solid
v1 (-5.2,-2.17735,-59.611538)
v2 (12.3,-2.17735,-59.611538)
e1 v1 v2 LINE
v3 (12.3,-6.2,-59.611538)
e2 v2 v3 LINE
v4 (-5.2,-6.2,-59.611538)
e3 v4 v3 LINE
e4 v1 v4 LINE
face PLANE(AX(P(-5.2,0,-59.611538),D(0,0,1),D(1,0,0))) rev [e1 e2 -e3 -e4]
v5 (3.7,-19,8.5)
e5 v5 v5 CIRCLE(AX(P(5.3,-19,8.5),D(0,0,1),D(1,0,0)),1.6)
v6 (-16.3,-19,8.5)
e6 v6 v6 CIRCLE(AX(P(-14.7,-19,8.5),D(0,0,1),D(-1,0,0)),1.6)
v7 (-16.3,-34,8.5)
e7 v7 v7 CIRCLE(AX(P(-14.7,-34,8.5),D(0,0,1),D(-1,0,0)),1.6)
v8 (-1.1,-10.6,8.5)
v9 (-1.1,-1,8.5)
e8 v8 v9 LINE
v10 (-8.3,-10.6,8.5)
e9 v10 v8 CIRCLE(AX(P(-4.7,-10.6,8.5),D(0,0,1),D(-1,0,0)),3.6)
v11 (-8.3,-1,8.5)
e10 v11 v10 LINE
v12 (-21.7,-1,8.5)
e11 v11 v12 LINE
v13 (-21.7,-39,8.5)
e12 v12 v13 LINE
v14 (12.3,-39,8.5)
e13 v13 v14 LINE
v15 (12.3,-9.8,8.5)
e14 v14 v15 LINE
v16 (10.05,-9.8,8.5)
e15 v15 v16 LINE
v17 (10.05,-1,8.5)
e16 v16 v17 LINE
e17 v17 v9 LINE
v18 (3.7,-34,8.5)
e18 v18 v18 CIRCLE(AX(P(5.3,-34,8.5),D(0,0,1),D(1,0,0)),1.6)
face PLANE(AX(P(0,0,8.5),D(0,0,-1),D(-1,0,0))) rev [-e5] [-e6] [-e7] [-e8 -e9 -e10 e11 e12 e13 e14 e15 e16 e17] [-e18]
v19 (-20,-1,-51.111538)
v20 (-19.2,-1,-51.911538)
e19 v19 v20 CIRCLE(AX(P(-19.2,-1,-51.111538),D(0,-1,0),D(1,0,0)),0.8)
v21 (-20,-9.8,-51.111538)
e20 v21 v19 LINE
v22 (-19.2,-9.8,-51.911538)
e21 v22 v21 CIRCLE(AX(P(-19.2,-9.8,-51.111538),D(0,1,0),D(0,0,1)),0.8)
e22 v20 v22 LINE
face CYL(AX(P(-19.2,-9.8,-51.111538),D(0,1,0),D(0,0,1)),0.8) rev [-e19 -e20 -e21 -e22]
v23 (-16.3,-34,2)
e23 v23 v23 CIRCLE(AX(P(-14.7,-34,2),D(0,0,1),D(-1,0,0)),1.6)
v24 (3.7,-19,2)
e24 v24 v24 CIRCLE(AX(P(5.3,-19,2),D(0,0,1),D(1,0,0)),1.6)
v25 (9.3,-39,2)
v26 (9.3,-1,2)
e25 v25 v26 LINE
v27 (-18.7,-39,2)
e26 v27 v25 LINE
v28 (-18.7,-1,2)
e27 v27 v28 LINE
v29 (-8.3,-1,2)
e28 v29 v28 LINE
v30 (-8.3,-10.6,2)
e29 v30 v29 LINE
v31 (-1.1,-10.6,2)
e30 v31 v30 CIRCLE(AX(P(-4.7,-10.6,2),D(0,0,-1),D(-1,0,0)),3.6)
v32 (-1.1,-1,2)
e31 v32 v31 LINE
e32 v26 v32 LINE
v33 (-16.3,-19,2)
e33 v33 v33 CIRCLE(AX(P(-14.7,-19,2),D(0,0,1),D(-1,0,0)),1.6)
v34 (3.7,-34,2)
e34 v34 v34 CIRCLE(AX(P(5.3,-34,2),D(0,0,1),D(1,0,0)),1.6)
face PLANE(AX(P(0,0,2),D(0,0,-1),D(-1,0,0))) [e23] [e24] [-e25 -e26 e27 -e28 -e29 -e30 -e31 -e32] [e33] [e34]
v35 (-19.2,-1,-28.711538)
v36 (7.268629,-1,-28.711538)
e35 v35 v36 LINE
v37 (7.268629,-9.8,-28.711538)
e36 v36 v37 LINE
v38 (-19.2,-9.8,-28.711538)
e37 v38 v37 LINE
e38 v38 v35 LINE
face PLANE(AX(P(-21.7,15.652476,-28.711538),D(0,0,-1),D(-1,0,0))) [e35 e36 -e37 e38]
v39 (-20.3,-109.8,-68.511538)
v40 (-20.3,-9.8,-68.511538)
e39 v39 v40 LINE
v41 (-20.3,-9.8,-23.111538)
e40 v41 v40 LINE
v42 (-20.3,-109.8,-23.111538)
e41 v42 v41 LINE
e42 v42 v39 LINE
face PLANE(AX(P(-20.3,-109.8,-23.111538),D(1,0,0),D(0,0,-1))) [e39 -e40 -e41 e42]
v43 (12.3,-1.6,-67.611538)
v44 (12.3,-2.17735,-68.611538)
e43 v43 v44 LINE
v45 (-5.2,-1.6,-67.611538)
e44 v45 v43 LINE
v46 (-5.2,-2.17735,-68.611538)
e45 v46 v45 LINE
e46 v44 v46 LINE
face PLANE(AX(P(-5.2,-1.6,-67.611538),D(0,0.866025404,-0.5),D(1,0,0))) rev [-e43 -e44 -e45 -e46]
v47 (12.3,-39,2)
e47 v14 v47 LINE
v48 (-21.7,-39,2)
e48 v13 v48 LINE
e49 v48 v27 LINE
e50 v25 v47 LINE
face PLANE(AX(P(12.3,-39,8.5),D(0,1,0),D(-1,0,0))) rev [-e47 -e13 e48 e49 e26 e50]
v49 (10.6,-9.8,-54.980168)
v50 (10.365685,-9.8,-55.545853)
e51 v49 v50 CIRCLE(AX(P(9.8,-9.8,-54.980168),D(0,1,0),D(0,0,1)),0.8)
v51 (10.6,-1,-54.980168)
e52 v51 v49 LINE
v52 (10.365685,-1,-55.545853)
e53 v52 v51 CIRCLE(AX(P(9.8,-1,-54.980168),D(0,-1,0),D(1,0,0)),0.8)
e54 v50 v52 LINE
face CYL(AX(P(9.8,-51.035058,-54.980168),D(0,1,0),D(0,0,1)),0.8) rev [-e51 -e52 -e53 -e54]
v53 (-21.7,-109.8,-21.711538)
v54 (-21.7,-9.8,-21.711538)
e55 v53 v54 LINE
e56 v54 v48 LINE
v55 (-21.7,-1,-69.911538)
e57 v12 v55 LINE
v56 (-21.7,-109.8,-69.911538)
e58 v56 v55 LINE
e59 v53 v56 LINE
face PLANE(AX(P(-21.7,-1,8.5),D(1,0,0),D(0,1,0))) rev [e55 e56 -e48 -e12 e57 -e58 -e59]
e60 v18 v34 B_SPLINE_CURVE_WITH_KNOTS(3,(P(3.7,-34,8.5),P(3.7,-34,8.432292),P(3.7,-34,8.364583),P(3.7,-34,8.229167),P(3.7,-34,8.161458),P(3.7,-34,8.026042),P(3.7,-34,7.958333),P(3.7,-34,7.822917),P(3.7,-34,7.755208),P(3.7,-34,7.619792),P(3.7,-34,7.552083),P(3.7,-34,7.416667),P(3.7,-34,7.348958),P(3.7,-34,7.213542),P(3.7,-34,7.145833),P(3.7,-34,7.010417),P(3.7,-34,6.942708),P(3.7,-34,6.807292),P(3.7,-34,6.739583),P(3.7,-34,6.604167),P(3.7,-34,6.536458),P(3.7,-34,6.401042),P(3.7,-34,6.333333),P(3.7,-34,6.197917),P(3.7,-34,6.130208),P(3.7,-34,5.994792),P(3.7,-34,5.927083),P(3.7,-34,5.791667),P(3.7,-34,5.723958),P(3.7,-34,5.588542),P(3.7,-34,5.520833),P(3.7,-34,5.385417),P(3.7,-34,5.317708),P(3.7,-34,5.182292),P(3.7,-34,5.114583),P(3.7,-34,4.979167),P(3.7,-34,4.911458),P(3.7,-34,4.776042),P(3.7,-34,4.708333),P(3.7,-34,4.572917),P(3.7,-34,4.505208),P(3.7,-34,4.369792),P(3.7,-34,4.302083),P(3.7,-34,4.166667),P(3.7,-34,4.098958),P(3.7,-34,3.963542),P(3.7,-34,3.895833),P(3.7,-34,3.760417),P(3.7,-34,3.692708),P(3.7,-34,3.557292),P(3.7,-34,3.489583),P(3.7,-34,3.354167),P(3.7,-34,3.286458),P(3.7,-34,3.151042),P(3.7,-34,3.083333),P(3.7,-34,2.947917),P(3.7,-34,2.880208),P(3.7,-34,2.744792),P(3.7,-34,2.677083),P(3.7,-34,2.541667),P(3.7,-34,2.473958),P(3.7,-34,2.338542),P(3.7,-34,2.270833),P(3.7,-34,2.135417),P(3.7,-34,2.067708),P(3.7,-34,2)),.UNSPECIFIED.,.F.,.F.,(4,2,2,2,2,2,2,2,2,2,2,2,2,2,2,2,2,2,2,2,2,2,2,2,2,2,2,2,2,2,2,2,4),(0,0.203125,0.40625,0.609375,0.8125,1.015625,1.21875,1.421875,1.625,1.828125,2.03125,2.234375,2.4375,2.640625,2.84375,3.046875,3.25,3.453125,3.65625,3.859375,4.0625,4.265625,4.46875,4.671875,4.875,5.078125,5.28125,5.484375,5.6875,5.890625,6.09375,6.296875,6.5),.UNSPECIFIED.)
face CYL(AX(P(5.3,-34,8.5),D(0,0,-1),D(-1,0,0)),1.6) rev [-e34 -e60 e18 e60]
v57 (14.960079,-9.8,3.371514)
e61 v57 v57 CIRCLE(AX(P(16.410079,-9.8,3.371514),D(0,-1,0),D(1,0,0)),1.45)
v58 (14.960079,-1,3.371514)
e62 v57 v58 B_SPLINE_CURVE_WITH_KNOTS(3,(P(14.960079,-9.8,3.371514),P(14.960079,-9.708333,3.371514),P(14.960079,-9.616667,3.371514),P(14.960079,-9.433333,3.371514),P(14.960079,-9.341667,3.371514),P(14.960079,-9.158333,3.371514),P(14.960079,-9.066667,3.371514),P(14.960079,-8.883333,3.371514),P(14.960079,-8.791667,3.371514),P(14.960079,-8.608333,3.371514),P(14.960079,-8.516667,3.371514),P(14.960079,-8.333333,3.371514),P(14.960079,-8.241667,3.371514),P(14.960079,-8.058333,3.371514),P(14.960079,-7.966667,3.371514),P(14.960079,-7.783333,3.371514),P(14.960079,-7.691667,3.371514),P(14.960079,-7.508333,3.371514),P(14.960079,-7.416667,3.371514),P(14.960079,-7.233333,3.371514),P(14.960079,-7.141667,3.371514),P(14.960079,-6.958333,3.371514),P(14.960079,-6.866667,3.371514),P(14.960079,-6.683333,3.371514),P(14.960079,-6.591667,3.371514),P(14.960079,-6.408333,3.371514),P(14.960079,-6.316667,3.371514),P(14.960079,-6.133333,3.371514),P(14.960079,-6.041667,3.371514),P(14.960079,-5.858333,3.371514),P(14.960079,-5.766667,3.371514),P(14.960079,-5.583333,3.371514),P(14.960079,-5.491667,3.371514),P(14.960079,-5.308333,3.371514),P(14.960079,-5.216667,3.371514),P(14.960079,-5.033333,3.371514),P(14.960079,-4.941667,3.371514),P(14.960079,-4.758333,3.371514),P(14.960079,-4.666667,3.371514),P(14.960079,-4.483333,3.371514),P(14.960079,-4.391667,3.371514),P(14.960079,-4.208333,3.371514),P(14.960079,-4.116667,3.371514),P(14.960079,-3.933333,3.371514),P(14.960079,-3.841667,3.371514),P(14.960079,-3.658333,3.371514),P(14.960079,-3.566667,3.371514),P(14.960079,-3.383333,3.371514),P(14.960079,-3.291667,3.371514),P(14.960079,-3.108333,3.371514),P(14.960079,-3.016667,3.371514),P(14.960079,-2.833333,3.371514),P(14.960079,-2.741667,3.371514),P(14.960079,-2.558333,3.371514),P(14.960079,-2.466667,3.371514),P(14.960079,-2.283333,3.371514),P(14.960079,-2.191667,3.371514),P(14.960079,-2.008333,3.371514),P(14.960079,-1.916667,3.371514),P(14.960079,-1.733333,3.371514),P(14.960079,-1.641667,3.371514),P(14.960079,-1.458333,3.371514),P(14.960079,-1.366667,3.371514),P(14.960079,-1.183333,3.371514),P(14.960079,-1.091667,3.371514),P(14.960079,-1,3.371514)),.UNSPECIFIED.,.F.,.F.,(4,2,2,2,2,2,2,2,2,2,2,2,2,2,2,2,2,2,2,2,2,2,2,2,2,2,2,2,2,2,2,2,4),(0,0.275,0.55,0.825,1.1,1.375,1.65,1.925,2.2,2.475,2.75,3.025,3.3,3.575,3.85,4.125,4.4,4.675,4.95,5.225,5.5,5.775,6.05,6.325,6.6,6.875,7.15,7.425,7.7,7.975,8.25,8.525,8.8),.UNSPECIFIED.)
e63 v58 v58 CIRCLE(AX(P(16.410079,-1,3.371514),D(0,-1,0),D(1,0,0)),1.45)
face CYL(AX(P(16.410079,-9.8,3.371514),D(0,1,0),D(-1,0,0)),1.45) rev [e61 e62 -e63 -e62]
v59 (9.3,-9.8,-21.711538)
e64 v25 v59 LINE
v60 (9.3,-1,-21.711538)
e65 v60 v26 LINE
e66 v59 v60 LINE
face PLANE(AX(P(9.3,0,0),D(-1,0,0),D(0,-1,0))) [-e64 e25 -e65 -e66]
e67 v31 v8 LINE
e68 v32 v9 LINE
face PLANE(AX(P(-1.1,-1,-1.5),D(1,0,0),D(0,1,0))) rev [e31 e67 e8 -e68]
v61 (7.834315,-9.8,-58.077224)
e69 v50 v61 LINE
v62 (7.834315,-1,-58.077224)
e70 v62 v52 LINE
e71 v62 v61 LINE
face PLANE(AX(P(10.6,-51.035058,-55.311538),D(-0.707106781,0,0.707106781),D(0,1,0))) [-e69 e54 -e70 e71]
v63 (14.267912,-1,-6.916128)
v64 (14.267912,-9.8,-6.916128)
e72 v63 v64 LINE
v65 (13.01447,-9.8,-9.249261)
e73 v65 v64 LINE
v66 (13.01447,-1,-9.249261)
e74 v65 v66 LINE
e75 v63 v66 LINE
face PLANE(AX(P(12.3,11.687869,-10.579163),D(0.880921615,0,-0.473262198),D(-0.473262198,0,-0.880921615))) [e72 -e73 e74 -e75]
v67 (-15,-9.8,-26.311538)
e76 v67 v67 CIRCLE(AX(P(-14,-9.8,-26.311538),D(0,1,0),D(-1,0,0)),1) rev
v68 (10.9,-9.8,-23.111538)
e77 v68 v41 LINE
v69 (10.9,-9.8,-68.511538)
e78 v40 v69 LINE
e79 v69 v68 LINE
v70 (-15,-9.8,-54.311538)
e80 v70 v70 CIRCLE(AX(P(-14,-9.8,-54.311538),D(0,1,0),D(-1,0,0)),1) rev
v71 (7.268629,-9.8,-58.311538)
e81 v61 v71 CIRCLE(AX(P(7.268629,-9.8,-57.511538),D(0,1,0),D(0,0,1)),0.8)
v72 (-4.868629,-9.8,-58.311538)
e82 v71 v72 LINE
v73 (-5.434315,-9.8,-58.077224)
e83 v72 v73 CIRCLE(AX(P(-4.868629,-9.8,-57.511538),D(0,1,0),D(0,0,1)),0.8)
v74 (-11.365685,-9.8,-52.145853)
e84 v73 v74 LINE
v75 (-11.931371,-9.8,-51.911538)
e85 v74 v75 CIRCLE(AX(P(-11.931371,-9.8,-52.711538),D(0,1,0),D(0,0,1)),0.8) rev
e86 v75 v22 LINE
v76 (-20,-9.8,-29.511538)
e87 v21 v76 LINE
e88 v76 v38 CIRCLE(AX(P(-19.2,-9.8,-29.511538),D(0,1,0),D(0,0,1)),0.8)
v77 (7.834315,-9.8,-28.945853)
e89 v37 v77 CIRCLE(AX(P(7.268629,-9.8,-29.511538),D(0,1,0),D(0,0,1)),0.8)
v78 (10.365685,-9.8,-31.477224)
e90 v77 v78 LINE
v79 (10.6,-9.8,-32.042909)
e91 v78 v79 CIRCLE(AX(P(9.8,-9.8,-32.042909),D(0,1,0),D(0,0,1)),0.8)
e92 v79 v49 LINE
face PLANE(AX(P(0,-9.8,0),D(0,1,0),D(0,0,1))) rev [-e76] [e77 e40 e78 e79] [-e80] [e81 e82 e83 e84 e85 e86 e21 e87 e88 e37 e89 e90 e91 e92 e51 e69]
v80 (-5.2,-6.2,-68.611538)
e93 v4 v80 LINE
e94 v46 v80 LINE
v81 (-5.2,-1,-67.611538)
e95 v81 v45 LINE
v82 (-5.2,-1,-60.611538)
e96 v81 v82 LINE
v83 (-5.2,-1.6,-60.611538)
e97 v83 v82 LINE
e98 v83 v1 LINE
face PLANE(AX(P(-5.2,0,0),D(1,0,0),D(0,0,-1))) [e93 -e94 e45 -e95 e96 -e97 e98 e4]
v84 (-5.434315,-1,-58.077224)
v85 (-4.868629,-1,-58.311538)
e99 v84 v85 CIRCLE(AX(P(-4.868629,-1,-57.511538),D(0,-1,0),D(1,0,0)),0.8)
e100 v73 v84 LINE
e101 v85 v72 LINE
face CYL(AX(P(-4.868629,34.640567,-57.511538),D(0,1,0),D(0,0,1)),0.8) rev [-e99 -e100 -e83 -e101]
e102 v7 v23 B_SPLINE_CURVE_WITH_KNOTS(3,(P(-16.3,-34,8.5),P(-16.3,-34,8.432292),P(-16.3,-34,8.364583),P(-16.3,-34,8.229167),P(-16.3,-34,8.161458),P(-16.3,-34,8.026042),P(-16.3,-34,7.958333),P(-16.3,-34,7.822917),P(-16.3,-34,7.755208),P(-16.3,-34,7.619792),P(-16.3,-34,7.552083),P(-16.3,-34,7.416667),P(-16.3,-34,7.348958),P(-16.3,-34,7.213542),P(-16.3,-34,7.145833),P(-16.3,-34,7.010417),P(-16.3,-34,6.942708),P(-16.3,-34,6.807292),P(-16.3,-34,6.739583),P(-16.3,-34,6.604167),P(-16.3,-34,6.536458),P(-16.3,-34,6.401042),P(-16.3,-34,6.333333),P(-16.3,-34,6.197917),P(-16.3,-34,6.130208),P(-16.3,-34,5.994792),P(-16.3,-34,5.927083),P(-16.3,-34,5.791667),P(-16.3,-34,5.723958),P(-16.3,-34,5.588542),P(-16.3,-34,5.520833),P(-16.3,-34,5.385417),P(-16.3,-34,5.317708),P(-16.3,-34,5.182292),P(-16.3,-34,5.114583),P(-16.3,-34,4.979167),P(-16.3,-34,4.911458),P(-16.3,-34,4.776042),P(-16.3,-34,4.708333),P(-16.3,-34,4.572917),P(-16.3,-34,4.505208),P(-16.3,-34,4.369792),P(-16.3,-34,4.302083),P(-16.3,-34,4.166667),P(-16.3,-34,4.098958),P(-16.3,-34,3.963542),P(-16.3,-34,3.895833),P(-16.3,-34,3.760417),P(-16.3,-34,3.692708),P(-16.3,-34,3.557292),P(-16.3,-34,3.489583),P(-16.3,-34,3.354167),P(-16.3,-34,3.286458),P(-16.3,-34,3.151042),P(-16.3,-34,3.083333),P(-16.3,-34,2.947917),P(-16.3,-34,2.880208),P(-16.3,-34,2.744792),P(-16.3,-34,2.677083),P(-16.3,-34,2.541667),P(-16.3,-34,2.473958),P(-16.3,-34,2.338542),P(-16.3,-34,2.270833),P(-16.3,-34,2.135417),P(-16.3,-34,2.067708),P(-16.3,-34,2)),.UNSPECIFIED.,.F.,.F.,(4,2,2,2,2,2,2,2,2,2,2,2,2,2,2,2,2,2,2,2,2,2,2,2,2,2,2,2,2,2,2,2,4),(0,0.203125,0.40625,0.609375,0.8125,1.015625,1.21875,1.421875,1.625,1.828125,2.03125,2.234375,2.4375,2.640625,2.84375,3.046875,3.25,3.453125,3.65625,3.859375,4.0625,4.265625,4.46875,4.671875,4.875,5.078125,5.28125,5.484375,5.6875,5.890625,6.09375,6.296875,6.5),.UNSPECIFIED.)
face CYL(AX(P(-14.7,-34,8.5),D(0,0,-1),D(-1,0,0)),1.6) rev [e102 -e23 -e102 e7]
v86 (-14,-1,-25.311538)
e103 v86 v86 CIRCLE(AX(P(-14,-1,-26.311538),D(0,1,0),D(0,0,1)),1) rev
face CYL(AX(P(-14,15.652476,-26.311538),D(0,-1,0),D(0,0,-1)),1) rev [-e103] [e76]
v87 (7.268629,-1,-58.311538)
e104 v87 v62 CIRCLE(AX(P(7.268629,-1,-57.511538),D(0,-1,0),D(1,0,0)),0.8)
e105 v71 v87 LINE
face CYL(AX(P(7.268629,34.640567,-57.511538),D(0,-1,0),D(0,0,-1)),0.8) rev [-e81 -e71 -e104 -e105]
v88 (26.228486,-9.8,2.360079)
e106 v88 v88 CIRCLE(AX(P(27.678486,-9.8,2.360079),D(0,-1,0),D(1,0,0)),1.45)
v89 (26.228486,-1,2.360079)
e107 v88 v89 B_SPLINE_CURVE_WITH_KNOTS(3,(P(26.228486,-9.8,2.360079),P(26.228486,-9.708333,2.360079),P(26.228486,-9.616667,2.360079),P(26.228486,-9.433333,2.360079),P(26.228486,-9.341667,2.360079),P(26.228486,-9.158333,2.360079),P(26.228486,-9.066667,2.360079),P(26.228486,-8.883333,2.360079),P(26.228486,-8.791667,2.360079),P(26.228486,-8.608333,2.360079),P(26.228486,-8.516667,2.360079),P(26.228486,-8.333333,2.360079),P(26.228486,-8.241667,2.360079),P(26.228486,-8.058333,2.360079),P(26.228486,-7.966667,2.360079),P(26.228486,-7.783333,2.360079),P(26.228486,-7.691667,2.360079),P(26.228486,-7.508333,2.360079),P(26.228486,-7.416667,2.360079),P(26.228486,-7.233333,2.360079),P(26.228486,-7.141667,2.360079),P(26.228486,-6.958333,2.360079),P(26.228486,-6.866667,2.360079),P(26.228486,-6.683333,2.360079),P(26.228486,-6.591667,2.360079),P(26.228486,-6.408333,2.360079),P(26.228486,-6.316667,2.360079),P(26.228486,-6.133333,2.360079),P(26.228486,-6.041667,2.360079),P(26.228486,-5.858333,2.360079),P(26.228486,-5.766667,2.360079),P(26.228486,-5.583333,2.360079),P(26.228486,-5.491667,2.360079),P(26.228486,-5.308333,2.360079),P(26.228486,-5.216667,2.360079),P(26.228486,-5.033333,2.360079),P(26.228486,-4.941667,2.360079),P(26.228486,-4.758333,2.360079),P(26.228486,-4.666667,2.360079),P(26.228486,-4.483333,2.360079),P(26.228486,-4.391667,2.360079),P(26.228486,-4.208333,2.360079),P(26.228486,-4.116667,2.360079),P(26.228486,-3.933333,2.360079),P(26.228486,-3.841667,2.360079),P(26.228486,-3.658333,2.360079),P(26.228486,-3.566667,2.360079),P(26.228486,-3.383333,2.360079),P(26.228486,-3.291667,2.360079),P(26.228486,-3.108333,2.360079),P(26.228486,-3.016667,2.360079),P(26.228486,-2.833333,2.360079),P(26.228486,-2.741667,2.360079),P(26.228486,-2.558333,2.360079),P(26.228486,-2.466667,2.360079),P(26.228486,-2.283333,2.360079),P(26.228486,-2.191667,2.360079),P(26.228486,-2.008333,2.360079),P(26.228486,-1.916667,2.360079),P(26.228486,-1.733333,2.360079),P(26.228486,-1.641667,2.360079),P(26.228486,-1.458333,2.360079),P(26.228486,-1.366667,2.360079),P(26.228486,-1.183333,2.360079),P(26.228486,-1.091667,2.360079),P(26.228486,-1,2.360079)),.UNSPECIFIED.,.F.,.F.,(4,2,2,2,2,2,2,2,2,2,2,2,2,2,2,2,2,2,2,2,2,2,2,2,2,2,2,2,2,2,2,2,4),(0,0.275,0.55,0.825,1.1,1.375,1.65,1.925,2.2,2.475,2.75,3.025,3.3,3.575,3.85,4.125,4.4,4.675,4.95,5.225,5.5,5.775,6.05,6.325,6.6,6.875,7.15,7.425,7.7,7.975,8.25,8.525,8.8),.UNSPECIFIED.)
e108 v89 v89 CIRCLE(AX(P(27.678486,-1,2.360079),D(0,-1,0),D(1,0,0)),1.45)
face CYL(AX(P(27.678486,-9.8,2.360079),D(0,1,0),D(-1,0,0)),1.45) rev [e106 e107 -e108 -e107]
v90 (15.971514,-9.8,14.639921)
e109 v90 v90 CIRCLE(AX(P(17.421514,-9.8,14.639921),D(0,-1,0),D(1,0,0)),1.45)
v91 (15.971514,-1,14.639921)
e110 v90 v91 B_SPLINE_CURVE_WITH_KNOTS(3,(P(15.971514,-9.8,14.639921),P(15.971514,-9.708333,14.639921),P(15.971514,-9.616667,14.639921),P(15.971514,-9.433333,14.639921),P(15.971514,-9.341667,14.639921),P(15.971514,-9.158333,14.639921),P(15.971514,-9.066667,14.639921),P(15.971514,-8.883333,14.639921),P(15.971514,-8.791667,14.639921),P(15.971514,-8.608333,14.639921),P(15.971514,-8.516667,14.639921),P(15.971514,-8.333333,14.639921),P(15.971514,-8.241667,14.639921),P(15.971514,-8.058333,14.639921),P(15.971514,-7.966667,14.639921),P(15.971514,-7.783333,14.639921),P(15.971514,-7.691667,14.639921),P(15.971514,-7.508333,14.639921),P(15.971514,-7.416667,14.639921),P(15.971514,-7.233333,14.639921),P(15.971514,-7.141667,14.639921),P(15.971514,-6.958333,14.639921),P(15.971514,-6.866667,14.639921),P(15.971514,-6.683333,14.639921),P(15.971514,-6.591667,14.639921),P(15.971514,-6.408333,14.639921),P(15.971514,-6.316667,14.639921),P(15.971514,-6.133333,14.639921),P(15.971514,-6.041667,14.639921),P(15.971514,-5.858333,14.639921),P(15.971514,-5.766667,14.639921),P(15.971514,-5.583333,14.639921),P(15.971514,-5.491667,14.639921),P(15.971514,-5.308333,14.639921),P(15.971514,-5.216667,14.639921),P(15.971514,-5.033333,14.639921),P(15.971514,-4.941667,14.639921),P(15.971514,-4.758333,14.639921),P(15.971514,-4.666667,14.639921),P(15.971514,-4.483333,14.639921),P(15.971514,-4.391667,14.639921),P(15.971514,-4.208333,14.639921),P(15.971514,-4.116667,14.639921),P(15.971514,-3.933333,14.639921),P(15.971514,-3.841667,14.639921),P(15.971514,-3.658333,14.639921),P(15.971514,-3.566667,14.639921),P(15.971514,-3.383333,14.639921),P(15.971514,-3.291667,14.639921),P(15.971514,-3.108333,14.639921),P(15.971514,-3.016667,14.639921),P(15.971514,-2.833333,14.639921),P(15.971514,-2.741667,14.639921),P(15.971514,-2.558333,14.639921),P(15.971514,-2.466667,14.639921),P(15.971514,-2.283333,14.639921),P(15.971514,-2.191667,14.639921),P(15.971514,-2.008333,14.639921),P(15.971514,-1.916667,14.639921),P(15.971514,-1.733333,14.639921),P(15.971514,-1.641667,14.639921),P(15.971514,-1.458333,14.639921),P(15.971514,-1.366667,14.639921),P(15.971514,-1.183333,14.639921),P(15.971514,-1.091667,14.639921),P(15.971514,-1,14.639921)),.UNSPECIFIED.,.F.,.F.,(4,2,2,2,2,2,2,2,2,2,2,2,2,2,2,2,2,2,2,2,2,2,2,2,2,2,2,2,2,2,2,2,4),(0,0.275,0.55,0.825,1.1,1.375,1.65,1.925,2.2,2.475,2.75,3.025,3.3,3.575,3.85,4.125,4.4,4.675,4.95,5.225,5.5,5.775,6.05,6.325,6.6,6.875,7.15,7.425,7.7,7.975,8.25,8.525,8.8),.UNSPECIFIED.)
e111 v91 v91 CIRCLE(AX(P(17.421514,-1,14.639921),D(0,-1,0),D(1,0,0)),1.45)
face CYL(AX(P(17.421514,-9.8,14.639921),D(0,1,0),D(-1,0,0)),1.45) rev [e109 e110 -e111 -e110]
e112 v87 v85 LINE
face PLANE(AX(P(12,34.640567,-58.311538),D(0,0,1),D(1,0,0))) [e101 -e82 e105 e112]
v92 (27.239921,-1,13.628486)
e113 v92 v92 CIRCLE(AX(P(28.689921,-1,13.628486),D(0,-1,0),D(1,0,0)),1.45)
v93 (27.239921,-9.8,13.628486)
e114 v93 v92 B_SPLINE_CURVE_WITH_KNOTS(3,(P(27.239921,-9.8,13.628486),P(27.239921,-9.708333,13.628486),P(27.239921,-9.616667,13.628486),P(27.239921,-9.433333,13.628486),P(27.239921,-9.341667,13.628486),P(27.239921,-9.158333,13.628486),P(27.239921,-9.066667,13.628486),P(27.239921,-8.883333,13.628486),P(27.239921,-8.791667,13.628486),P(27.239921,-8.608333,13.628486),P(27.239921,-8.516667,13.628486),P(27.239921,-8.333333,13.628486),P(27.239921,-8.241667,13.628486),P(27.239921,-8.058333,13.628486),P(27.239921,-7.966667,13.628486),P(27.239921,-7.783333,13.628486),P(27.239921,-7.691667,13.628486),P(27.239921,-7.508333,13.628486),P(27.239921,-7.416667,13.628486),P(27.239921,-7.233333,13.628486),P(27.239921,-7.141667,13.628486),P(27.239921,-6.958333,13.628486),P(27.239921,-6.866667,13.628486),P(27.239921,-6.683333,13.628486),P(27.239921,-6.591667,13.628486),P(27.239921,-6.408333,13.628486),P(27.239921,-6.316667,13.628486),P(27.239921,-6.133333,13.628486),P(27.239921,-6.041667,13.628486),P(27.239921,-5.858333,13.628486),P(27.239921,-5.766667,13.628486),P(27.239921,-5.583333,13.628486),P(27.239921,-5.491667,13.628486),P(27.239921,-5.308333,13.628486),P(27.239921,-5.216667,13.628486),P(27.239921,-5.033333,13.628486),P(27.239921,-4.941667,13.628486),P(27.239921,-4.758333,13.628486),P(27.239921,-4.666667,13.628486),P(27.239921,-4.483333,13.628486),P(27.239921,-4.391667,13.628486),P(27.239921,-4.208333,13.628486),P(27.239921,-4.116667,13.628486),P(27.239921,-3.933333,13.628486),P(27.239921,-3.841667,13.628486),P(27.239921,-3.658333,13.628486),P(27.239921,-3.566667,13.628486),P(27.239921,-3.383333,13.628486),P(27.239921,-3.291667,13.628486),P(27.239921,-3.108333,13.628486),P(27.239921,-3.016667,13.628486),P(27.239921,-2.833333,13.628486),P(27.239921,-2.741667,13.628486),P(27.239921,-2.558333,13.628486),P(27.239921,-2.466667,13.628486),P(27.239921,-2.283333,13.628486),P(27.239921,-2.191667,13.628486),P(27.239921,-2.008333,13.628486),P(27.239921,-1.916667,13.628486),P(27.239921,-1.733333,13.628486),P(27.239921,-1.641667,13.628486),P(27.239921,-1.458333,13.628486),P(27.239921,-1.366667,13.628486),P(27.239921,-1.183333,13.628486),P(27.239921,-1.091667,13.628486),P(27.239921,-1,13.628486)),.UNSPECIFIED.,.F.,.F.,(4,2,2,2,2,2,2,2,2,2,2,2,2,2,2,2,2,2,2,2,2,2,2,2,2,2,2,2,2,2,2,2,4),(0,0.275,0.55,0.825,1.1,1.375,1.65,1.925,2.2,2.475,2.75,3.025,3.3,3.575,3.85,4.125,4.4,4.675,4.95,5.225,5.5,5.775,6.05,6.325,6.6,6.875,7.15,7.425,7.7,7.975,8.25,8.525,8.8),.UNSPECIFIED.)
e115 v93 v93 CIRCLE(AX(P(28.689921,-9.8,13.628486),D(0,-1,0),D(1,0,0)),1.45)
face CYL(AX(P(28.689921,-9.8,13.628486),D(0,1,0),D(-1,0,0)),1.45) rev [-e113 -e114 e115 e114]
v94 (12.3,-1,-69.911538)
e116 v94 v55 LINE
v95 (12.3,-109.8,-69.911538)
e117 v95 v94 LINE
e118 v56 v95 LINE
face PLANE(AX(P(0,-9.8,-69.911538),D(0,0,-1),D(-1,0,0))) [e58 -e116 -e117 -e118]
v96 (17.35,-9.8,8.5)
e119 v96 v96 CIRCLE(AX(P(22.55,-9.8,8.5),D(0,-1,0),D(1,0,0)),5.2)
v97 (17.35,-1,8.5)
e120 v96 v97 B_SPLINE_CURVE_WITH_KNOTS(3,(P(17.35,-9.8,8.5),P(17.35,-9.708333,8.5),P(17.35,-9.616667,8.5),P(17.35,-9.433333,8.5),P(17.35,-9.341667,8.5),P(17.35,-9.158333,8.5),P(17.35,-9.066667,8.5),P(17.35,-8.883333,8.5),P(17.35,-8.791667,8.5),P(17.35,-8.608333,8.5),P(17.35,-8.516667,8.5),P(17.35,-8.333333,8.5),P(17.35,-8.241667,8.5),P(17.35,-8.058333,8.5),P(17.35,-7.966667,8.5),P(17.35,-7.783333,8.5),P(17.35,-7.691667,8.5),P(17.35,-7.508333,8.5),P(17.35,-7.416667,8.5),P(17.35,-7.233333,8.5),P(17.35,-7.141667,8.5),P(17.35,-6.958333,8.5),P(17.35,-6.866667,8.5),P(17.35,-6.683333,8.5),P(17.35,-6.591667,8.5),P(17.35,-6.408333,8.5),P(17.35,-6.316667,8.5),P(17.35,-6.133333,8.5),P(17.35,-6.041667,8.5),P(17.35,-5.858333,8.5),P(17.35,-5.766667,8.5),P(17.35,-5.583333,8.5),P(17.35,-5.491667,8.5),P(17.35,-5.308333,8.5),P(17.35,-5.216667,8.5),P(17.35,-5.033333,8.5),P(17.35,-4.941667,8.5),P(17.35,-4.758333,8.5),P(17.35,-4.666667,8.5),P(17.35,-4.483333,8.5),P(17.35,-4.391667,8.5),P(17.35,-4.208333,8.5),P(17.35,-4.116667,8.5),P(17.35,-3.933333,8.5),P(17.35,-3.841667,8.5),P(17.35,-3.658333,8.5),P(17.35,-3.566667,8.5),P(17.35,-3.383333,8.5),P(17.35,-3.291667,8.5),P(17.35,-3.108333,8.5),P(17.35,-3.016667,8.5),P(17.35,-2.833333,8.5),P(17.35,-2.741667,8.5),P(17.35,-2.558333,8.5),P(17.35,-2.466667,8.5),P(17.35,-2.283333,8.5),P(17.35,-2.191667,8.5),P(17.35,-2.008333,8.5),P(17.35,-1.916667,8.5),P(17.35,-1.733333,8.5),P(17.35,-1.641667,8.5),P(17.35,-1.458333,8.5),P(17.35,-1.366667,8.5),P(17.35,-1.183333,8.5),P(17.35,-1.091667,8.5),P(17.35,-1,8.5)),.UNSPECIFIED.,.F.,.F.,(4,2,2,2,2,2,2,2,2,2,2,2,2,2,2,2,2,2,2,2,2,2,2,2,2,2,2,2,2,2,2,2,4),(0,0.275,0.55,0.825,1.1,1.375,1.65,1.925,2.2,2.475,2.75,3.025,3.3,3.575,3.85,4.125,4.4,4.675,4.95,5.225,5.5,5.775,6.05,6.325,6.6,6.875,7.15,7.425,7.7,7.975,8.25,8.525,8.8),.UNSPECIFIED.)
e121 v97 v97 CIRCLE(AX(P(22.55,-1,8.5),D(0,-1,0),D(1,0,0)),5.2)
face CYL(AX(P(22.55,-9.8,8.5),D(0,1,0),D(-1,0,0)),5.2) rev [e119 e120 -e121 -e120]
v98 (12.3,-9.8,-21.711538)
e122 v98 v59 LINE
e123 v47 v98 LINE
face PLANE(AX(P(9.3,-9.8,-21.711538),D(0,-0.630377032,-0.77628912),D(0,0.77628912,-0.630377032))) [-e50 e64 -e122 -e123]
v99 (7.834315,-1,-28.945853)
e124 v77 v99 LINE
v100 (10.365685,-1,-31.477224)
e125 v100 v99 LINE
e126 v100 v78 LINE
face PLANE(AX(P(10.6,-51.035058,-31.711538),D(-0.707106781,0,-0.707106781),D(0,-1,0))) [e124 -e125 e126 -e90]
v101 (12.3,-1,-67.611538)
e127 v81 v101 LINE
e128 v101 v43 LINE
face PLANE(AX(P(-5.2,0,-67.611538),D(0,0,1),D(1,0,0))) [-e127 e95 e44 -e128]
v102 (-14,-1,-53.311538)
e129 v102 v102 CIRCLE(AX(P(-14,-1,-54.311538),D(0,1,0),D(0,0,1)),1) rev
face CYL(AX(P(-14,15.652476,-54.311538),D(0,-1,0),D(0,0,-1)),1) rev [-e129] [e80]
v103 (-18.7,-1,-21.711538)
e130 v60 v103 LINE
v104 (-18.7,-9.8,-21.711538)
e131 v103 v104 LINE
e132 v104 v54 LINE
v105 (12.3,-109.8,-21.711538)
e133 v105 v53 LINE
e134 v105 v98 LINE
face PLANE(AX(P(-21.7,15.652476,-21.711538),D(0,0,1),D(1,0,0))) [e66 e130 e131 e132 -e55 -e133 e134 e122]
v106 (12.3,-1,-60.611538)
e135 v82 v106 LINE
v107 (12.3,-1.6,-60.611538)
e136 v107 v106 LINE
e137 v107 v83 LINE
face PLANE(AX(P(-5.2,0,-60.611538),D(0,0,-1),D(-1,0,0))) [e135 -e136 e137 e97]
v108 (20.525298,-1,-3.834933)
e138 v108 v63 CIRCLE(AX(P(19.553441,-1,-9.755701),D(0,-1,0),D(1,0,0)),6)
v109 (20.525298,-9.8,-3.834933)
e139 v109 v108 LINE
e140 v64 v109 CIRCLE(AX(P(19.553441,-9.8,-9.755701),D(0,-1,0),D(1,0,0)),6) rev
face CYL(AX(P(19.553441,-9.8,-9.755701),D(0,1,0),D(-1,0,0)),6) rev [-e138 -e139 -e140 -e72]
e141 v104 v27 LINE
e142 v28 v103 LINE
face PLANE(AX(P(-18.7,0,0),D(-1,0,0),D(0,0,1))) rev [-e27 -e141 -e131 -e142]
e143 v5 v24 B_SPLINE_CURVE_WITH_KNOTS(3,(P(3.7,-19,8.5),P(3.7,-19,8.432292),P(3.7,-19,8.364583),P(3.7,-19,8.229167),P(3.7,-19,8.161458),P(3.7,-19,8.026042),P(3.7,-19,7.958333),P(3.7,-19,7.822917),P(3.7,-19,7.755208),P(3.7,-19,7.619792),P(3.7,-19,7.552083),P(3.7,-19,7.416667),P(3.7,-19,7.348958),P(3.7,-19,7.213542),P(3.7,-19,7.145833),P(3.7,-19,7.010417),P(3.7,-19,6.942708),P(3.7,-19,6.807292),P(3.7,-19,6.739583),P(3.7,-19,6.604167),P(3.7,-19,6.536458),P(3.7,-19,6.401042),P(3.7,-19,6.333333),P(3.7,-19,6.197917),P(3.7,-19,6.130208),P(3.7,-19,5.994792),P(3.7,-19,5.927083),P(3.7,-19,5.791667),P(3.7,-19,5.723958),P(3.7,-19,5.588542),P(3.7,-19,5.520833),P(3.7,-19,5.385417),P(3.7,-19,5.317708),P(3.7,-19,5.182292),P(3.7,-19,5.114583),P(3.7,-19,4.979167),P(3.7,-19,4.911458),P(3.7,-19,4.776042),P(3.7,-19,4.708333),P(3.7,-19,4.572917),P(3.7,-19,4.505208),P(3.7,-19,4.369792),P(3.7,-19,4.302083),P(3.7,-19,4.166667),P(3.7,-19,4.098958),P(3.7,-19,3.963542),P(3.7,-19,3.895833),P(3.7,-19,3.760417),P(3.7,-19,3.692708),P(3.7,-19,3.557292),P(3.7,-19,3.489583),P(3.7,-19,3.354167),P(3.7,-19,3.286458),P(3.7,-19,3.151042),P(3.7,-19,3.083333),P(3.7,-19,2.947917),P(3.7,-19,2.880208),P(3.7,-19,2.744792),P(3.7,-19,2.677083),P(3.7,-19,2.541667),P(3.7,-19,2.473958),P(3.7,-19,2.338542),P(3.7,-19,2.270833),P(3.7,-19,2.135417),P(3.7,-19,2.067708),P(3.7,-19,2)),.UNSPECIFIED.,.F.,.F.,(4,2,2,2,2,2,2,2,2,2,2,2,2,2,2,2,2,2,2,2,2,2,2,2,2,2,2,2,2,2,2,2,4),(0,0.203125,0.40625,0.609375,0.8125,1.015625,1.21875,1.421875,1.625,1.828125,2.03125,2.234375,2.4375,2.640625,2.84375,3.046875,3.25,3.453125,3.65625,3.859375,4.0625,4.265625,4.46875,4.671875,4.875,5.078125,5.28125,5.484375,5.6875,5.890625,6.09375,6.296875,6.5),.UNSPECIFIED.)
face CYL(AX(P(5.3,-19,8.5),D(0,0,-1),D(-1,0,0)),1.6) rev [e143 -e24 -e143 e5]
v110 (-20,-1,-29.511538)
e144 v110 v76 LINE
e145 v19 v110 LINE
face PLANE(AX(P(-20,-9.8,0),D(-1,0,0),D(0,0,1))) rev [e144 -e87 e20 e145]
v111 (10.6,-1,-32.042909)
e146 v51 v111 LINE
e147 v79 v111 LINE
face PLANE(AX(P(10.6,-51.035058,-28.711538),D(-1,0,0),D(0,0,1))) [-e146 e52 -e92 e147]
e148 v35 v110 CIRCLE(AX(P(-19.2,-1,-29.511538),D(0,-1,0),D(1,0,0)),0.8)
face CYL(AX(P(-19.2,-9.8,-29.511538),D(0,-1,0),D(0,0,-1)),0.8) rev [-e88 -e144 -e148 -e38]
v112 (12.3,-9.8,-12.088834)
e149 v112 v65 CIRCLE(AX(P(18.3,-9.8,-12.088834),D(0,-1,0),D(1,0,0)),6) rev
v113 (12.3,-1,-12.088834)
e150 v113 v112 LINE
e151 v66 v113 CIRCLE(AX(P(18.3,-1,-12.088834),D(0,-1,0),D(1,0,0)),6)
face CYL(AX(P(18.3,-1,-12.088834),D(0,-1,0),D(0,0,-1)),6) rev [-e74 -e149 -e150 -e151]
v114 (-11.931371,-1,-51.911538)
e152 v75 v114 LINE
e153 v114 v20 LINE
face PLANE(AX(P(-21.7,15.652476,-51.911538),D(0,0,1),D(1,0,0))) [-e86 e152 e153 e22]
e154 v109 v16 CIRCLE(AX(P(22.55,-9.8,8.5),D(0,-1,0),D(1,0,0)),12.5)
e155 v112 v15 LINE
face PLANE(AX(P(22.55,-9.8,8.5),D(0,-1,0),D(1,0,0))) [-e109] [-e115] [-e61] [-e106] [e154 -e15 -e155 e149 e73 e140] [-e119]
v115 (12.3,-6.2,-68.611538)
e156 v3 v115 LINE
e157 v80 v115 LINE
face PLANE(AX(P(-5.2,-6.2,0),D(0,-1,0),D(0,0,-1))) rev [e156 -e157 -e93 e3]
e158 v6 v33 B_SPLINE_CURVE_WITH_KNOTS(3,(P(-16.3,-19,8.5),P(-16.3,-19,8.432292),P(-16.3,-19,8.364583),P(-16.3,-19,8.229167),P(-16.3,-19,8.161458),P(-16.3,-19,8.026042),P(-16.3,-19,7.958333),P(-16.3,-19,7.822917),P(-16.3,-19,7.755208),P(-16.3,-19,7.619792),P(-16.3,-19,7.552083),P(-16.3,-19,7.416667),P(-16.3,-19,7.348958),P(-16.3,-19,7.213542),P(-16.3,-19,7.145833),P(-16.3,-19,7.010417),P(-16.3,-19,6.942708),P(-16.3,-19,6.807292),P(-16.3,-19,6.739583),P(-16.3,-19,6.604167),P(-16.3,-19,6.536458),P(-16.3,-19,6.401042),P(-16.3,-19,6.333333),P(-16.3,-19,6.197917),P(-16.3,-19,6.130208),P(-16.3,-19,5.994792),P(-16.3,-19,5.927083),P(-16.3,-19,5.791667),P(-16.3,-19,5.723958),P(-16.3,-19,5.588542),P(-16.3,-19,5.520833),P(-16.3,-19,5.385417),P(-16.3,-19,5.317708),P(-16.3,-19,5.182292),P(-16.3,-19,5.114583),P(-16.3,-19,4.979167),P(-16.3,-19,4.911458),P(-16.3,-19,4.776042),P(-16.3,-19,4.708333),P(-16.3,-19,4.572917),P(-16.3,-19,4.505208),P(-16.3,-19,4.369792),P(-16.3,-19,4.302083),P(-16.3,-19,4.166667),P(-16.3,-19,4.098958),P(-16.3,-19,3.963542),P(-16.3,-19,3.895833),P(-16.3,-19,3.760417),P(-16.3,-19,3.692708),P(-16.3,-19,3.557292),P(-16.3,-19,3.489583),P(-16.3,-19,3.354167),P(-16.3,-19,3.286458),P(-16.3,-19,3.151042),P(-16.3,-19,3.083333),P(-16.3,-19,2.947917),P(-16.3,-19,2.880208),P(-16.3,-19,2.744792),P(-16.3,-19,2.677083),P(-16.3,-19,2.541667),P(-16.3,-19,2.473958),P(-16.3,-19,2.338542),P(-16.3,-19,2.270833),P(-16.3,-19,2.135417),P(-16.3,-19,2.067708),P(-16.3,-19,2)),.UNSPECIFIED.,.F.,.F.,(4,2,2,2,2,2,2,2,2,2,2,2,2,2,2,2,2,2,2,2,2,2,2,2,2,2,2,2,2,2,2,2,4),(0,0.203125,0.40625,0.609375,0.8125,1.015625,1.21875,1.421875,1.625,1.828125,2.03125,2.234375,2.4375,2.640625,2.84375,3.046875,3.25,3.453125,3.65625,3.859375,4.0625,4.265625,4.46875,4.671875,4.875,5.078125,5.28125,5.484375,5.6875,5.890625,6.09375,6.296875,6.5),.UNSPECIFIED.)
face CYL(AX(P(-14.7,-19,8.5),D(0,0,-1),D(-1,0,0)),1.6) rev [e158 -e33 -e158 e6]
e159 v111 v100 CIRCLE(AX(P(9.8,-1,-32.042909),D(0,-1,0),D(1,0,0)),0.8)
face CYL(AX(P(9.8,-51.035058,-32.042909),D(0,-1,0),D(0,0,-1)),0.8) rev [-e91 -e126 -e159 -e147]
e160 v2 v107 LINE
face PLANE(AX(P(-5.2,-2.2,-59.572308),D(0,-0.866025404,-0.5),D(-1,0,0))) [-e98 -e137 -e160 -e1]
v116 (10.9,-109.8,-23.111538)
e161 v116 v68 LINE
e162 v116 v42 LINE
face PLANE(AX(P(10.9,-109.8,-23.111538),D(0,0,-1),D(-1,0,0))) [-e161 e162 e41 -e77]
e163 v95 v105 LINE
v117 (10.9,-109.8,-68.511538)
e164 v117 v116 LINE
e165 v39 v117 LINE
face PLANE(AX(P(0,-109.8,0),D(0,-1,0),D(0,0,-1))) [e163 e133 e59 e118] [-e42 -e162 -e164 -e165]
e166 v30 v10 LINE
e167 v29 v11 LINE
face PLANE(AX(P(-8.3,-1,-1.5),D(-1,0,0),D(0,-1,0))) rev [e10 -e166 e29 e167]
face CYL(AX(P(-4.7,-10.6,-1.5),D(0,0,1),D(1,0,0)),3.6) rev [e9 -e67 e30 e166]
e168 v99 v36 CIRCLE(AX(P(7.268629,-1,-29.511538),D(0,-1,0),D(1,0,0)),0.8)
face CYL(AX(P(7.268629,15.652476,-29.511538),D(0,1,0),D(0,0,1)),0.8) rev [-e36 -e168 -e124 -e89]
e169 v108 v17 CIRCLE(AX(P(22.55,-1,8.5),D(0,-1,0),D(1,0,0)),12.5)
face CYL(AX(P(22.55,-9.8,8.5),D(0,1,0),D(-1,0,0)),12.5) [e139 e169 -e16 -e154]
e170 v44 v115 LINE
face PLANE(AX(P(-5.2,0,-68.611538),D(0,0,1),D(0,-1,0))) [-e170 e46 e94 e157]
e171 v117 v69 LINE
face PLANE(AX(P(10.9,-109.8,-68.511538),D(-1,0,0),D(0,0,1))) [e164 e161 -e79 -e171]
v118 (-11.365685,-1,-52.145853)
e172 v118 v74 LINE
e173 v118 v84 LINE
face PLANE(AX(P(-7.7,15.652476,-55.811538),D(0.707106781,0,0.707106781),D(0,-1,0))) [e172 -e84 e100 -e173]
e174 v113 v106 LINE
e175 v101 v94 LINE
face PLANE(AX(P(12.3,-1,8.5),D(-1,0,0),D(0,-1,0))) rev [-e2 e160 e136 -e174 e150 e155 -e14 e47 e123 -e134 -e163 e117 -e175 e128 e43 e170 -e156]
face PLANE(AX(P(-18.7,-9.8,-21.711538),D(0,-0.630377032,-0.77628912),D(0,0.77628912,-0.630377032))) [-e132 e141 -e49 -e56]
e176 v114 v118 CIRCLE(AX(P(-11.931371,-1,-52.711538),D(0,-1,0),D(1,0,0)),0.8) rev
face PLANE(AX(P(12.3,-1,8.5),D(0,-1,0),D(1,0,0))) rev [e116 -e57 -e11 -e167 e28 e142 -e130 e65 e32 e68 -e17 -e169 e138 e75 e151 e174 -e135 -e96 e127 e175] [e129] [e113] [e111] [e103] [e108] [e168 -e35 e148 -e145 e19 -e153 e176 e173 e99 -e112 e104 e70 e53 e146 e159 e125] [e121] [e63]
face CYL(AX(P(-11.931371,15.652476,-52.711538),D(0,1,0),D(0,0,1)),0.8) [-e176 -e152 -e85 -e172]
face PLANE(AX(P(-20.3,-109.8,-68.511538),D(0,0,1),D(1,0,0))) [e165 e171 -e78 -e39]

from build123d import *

# Parameters (mm, degrees)
BOSS_EXTRUDE1_START      = -1
SKETCH1_W                = 1.7
SKETCH1_H                = 89.2
BOSS_EXTRUDE1_DEPTH      = 8.8
SKETCH4_W                = 33.7
SKETCH4_H                = 11.6
BOSS_EXTRUDE3_DEPTH      = 8.8
SERVO_HOLDER_DEPTH       = 1
SERVO_HOLDER_DEPTH_BACK  = 8.8
SKETCH3_W                = 14
SKETCH3_H                = 7
SKETCH3_R                = 1
SKETCH37_W               = 20
SKETCH37_H               = 7
BOSS_EXTRUDE19_DEPTH     = 9.8
CUT_EXTRUDE10_DEPTH      = 93.434679639
CUT_EXTRUDE10_DEPTH_BACK = 93.434679639
SKETCH29_W               = 34.409909993
SKETCH29_H               = 6.377389624
BOSS_EXTRUDE13_START     = 2
SKETCH30_W               = 34
SKETCH30_H               = 38
SKETCH30_R               = 1.6
BOSS_EXTRUDE13_DEPTH     = 6.5
SKETCH41_W               = 17.288461538
SKETCH41_H               = 8.8
CUT_EXTRUDE14_DEPTH      = 15
BOSS_EXTRUDE14_START     = -38
SKETCH32_R               = 1.45
SKETCH32_R_2             = 5.2
BOSS_EXTRUDE14_DEPTH     = 8.8
BOSS_EXTRUDE16_DEPTH     = 3
BOSS_EXTRUDE17_DEPTH     = 3
BOSS_EXTRUDE18_DEPTH     = 8.8
SKETCH39_W               = 1.7
SKETCH39_H               = 41.2
BOSS_EXTRUDE20_DEPTH     = 8.8
CUT_EXTRUDE13_DEPTH      = 17.5
CHAMFER2_SIZE            = 0.6
CHAMFER2_SIZE_2          = 1.039230485
CHAMFER3_SIZE            = 3
FILLET10_R               = 6
CUT_EXTRUDE15_DEPTH      = 10
CHAMFER4_SIZE            = 2.5
CUT_EXTRUDE16_DEPTH      = 10
FILLET11_R               = 0.8
SKETCH44_W               = 34
SKETCH44_H               = 48.2
SKETCH44_W_2             = 31.2
SKETCH44_H_2             = 45.4
BOSS_EXTRUDE21_DEPTH     = 100


with BuildPart() as part:
    # Sketch1 → Boss-Extrude1 (new body)
    with BuildSketch(Plane(origin=(0, 0, 0), x_dir=(1, 0, 0), z_dir=(0, 1, 0)).offset(BOSS_EXTRUDE1_START)):
        with Locations((-20.85, 25.311538462)):
            Rectangle(SKETCH1_W, SKETCH1_H)
    extrude(amount=-BOSS_EXTRUDE1_DEPTH)

    # Sketch4 → Boss-Extrude3 (add)
    with BuildSketch(Plane.XZ.offset(9.8)):
        with Locations((-4.85, -64.111538462)):
            Rectangle(SKETCH4_W, SKETCH4_H)
    extrude(amount=-BOSS_EXTRUDE3_DEPTH)

    # Sketch3 → Servo Holder (add, two sides: drawn at the far end of the back side and taken through both)
    # profile 1 of 2: a face of its own
    with BuildSketch(Plane.XZ.offset(9.8).offset(-SERVO_HOLDER_DEPTH_BACK)):
        with Locations((-14.7, -55.411538462)):
            Rectangle(SKETCH3_W, SKETCH3_H)
        with Locations(Location((-14, -54.311538462, 0), (0, 0, 270))):
            Circle(SKETCH3_R, mode=Mode.SUBTRACT)
    # profile 2 of 2: a face of its own
    with BuildSketch(Plane.XZ.offset(9.8).offset(-SERVO_HOLDER_DEPTH_BACK)):
        with Locations((-14.7, -25.211538462)):
            Rectangle(SKETCH3_W, SKETCH3_H)
        with Locations(Location((-14, -26.311538462, 0), (0, 0, 90))):
            Circle(SKETCH3_R, mode=Mode.SUBTRACT)
    extrude(amount=SERVO_HOLDER_DEPTH + SERVO_HOLDER_DEPTH_BACK)

    # Sketch37 → Boss-Extrude19 (add)
    with BuildSketch(Plane(origin=(0, -1, 0), x_dir=(1, 0, 0), z_dir=(0, 1, 0))):
        with Locations((2.3, 25.211538462)):
            Rectangle(SKETCH37_W, SKETCH37_H)
    extrude(amount=-BOSS_EXTRUDE19_DEPTH)

    # Sketch29 → Cut-Extrude10 (cut, two sides: drawn at the far end of the back side and taken through both)
    with BuildSketch(Plane(origin=(0, 0, -69.911538462), x_dir=(-1, 0, 0), z_dir=(0, 0, -1)).offset(-CUT_EXTRUDE10_DEPTH_BACK)):
        with Locations((4.495045004, -12.988694812)):
            Rectangle(SKETCH29_W, SKETCH29_H)
    extrude(amount=CUT_EXTRUDE10_DEPTH + CUT_EXTRUDE10_DEPTH_BACK, mode=Mode.SUBTRACT)


with BuildPart() as body_2:
    # Sketch30 → Boss-Extrude13 (new body)
    with BuildSketch(Plane.XY.offset(BOSS_EXTRUDE13_START)):
        with Locations((-4.7, -20)):
            Rectangle(SKETCH30_W, SKETCH30_H)
        with Locations(Location((5.3, -34, 0), (0, 0, 180))):
            Circle(SKETCH30_R, mode=Mode.SUBTRACT)
        with Locations(Location((5.3, -19, 0), (0, 0, 180))):
            Circle(SKETCH30_R, mode=Mode.SUBTRACT)
        with Locations(Location((-14.7, -34, 0), (0, 0, 180))):
            Circle(SKETCH30_R, mode=Mode.SUBTRACT)
        with Locations(Location((-14.7, -19, 0), (0, 0, 180))):
            Circle(SKETCH30_R, mode=Mode.SUBTRACT)
    extrude(amount=BOSS_EXTRUDE13_DEPTH)


with BuildPart() as cut_extrude14_tool:
    # Sketch41 → Cut-Extrude14 (new body)
    with BuildSketch(Plane(origin=(-20, 0, 0), x_dir=(0, 0, -1), z_dir=(1, 0, 0))):
        with Locations((-10.644230769, -5.4)):
            Rectangle(SKETCH41_W, SKETCH41_H)
    extrude(amount=-CUT_EXTRUDE14_DEPTH)


with BuildPart() as part_1:
    add(part.part)

    # Cut-Extrude14: cut by cut_extrude14_tool
    add(cut_extrude14_tool.part, mode=Mode.SUBTRACT)



with BuildPart() as body_2_1:
    add(body_2.part)

    # Cut-Extrude14: cut by cut_extrude14_tool
    add(cut_extrude14_tool.part, mode=Mode.SUBTRACT)

    # Sketch32 → Boss-Extrude14 (add)
    with BuildSketch(Plane.XZ.offset(39).offset(BOSS_EXTRUDE14_START)):
        with BuildLine():
            ThreePointArc((11.872921748, 2), (25.925390485, -3.535644523), (35.05, 8.5))
            ThreePointArc((35.05, 8.5), (22.55, 21), (10.05, 8.5))
            Line((10.05, 8.5), (12.3, 8.5))
            Line((12.3, 8.5), (12.3, 2))
            Line((12.3, 2), (11.872921748, 2))
        make_face()
        with Locations(Location((16.410078628, 3.371514303, 0), (0, 0, 180))):
            Circle(SKETCH32_R, mode=Mode.SUBTRACT)
        with Locations(Location((27.678485697, 2.360078628, 0), (0, 0, 180))):
            Circle(SKETCH32_R, mode=Mode.SUBTRACT)
        with Locations(Location((17.421514303, 14.639921372, 0), (0, 0, 180))):
            Circle(SKETCH32_R, mode=Mode.SUBTRACT)
        with Locations(Location((22.55, 8.5, 0), (0, 0, 180))):
            Circle(SKETCH32_R_2, mode=Mode.SUBTRACT)
        with Locations(Location((28.689921372, 13.628485697, 0), (0, 0, 180))):
            Circle(SKETCH32_R, mode=Mode.SUBTRACT)
    extrude(amount=BOSS_EXTRUDE14_DEPTH)


with BuildPart() as part_2:
    add(part_1.part)

    add(body_2_1.part)  # Boss-Extrude16 merges body 2
    # Sketch34 → Boss-Extrude16 (add)
    with BuildSketch(Plane.ZY.offset(21.7)):
        Polygon((-21.711538462, -1), (-21.711538462, -9.8), (2, -39), (8.5, -39), (8.5, -1), align=None)
    extrude(amount=-BOSS_EXTRUDE16_DEPTH)

    # Sketch35 → Boss-Extrude17 (add)
    with BuildSketch(Plane(origin=(12.3, 0, 0), x_dir=(0, 0, -1), z_dir=(1, 0, 0))):
        Polygon((-2, -1), (21.711538462, -1), (21.711538462, -9.8), (-2, -39), (-8.5, -39), (-8.5, -9.8), (-8.5, -1), align=None)
    extrude(amount=-BOSS_EXTRUDE17_DEPTH)

    # Sketch36 → Boss-Extrude18 (add)
    with BuildSketch(Plane.XZ.offset(9.8)):
        Polygon((12.3, -10.579162849), (16.63422252, -2.511520186), (12.3, 1.345455989), align=None)
    extrude(amount=-BOSS_EXTRUDE18_DEPTH)

    # Sketch39 → Boss-Extrude20 (add)
    with BuildSketch(Plane(origin=(0, -1, 0), x_dir=(1, 0, 0), z_dir=(0, 1, 0))):
        with Locations((11.45, 49.311538462)):
            Rectangle(SKETCH39_W, SKETCH39_H)
    extrude(amount=-BOSS_EXTRUDE20_DEPTH)

    # Sketch40 → Cut-Extrude13 (cut)
    with BuildSketch(Plane(origin=(12.3, 0, 0), x_dir=(0, 0, -1), z_dir=(1, 0, 0))):
        Polygon((64.111538462, -1), (60.611538462, -1), (60.611538462, -2.2), (59.611538462, -2.2), (59.611538462, -6.2), (64.111538462, -6.2), align=None)
        Polygon((67.611538462, -1), (64.111538462, -1), (64.111538462, -6.2), (68.611538462, -6.2), (68.611538462, -2.2), (67.611538462, -2.2), align=None)
    extrude(amount=-CUT_EXTRUDE13_DEPTH, mode=Mode.SUBTRACT)

    # Chamfer2
    # the kernel refuses this chamfer: 1.039230485, 0.6 mm, written as the material it takes off along each edge
    with BuildSketch(Plane(origin=(14.988578382, -2.2, -67.611538462), x_dir=(0, 0.9983227437537925, 0.05789386240267319), z_dir=(-1, 0, 0))) as chamfer2_piece_1_section:
        Polygon((CHAMFER2_SIZE * 0.998322743754, CHAMFER2_SIZE * 0.0578938624027), (-CHAMFER2_SIZE_2 * 0.0578938623771, CHAMFER2_SIZE_2 * 0.998322743313), (0, 0), align=None)
    chamfer2_piece_1 = extrude(amount=20.188578382, mode=Mode.PRIVATE)
    chamfer2_piece_1 = split(chamfer2_piece_1, bisect_by=Plane(origin=(4.894289191, -2.005782009, -68.611538462), z_dir=(0, 0, 1)), keep=Keep.TOP, mode=Mode.PRIVATE)
    add(chamfer2_piece_1, mode=Mode.SUBTRACT)
    with BuildSketch(Plane(origin=(14.988578382, -2.2, -60.611538462), x_dir=(0, 0.9983227437537925, -0.05789386240267317), z_dir=(-1, 0, 0))) as chamfer2_piece_2_section:
        Polygon((CHAMFER2_SIZE * 0.998322743754, -CHAMFER2_SIZE * 0.0578938624027), (-CHAMFER2_SIZE_2 * 0.0578938623771, -CHAMFER2_SIZE_2 * 0.998322743313), (0, 0), align=None)
    chamfer2_piece_2 = extrude(amount=20.188578382, mode=Mode.PRIVATE)
    chamfer2_piece_2 = split(chamfer2_piece_2, bisect_by=Plane(origin=(4.894289191, -2.005782009, -59.611538462), z_dir=(0, 0, -1)), keep=Keep.TOP, mode=Mode.PRIVATE)
    add(chamfer2_piece_2, mode=Mode.SUBTRACT)

    # Chamfer3
    chamfer3_edges = [part_2.edges().sort_by_distance(p)[0] for p in [
        (10.6, -5.4, -58.311538462),
        (10.6, -5.4, -28.711538462),
    ]]
    chamfer(chamfer3_edges, length=CHAMFER3_SIZE)

    # Fillet10
    fillet10_edges = [part_2.edges().sort_by_distance(p)[0] for p in [
        (16.63422252, -5.4, -2.511520186),
        (12.3, -5.4, -10.579162849),
    ]]
    fillet(fillet10_edges, radius=FILLET10_R)

    # Sketch42 → Cut-Extrude15 (cut)
    with BuildSketch(Plane.XY.offset(8.5)):
        with BuildLine():
            Line((-1.1, -1), (-1.1, -10.6))
            ThreePointArc((-1.1, -10.6), (-4.7, -14.2), (-8.3, -10.6))
            Line((-8.3, -10.6), (-8.3, -1))
            Line((-8.3, -1), (-1.1, -1))
        make_face()
    extrude(amount=-CUT_EXTRUDE15_DEPTH, mode=Mode.SUBTRACT)

    # Chamfer4
    chamfer4_edges = [part_2.edges().sort_by_distance(p)[0] for p in [
        (-7.7, -5.4, -58.311538462),
    ]]
    chamfer(chamfer4_edges, length=CHAMFER4_SIZE)

    # Sketch43 → Cut-Extrude16 (cut)
    with BuildSketch(Plane(origin=(0, -1, 0), x_dir=(1, 0, 0), z_dir=(0, 1, 0))):
        Polygon((-5.2, 58.311538462), (-11.6, 51.911538462), (-5.2, 51.911538462), align=None)
    extrude(amount=-CUT_EXTRUDE16_DEPTH, mode=Mode.SUBTRACT)

    # Fillet11
    fillet11_edges = [part_2.edges().sort_by_distance(p)[0] for p in [
        (-20, -5.4, -28.711538462),
        (-20, -5.4, -51.911538462),
        (10.6, -5.4, -55.311538462),
        (10.6, -5.4, -31.711538462),
        (7.6, -5.4, -28.711538462),
        (7.6, -5.4, -58.311538462),
        (-5.2, -5.4, -58.311538462),
        (-11.6, -5.4, -51.911538462),
    ]]
    fillet(fillet11_edges, radius=FILLET11_R)

    # Sketch44 → Boss-Extrude21 (add)
    with BuildSketch(Plane(origin=(0, -9.8, 0), x_dir=(-1, 0, 0), z_dir=(0, -1, 0))):
        with Locations((4.7, 45.811538462)):
            Rectangle(SKETCH44_W, SKETCH44_H)
        with Locations((4.7, 45.811538462)):
            Rectangle(SKETCH44_W_2, SKETCH44_H_2, mode=Mode.SUBTRACT)
    extrude(amount=BOSS_EXTRUDE21_DEPTH)


solid = part_2.part
